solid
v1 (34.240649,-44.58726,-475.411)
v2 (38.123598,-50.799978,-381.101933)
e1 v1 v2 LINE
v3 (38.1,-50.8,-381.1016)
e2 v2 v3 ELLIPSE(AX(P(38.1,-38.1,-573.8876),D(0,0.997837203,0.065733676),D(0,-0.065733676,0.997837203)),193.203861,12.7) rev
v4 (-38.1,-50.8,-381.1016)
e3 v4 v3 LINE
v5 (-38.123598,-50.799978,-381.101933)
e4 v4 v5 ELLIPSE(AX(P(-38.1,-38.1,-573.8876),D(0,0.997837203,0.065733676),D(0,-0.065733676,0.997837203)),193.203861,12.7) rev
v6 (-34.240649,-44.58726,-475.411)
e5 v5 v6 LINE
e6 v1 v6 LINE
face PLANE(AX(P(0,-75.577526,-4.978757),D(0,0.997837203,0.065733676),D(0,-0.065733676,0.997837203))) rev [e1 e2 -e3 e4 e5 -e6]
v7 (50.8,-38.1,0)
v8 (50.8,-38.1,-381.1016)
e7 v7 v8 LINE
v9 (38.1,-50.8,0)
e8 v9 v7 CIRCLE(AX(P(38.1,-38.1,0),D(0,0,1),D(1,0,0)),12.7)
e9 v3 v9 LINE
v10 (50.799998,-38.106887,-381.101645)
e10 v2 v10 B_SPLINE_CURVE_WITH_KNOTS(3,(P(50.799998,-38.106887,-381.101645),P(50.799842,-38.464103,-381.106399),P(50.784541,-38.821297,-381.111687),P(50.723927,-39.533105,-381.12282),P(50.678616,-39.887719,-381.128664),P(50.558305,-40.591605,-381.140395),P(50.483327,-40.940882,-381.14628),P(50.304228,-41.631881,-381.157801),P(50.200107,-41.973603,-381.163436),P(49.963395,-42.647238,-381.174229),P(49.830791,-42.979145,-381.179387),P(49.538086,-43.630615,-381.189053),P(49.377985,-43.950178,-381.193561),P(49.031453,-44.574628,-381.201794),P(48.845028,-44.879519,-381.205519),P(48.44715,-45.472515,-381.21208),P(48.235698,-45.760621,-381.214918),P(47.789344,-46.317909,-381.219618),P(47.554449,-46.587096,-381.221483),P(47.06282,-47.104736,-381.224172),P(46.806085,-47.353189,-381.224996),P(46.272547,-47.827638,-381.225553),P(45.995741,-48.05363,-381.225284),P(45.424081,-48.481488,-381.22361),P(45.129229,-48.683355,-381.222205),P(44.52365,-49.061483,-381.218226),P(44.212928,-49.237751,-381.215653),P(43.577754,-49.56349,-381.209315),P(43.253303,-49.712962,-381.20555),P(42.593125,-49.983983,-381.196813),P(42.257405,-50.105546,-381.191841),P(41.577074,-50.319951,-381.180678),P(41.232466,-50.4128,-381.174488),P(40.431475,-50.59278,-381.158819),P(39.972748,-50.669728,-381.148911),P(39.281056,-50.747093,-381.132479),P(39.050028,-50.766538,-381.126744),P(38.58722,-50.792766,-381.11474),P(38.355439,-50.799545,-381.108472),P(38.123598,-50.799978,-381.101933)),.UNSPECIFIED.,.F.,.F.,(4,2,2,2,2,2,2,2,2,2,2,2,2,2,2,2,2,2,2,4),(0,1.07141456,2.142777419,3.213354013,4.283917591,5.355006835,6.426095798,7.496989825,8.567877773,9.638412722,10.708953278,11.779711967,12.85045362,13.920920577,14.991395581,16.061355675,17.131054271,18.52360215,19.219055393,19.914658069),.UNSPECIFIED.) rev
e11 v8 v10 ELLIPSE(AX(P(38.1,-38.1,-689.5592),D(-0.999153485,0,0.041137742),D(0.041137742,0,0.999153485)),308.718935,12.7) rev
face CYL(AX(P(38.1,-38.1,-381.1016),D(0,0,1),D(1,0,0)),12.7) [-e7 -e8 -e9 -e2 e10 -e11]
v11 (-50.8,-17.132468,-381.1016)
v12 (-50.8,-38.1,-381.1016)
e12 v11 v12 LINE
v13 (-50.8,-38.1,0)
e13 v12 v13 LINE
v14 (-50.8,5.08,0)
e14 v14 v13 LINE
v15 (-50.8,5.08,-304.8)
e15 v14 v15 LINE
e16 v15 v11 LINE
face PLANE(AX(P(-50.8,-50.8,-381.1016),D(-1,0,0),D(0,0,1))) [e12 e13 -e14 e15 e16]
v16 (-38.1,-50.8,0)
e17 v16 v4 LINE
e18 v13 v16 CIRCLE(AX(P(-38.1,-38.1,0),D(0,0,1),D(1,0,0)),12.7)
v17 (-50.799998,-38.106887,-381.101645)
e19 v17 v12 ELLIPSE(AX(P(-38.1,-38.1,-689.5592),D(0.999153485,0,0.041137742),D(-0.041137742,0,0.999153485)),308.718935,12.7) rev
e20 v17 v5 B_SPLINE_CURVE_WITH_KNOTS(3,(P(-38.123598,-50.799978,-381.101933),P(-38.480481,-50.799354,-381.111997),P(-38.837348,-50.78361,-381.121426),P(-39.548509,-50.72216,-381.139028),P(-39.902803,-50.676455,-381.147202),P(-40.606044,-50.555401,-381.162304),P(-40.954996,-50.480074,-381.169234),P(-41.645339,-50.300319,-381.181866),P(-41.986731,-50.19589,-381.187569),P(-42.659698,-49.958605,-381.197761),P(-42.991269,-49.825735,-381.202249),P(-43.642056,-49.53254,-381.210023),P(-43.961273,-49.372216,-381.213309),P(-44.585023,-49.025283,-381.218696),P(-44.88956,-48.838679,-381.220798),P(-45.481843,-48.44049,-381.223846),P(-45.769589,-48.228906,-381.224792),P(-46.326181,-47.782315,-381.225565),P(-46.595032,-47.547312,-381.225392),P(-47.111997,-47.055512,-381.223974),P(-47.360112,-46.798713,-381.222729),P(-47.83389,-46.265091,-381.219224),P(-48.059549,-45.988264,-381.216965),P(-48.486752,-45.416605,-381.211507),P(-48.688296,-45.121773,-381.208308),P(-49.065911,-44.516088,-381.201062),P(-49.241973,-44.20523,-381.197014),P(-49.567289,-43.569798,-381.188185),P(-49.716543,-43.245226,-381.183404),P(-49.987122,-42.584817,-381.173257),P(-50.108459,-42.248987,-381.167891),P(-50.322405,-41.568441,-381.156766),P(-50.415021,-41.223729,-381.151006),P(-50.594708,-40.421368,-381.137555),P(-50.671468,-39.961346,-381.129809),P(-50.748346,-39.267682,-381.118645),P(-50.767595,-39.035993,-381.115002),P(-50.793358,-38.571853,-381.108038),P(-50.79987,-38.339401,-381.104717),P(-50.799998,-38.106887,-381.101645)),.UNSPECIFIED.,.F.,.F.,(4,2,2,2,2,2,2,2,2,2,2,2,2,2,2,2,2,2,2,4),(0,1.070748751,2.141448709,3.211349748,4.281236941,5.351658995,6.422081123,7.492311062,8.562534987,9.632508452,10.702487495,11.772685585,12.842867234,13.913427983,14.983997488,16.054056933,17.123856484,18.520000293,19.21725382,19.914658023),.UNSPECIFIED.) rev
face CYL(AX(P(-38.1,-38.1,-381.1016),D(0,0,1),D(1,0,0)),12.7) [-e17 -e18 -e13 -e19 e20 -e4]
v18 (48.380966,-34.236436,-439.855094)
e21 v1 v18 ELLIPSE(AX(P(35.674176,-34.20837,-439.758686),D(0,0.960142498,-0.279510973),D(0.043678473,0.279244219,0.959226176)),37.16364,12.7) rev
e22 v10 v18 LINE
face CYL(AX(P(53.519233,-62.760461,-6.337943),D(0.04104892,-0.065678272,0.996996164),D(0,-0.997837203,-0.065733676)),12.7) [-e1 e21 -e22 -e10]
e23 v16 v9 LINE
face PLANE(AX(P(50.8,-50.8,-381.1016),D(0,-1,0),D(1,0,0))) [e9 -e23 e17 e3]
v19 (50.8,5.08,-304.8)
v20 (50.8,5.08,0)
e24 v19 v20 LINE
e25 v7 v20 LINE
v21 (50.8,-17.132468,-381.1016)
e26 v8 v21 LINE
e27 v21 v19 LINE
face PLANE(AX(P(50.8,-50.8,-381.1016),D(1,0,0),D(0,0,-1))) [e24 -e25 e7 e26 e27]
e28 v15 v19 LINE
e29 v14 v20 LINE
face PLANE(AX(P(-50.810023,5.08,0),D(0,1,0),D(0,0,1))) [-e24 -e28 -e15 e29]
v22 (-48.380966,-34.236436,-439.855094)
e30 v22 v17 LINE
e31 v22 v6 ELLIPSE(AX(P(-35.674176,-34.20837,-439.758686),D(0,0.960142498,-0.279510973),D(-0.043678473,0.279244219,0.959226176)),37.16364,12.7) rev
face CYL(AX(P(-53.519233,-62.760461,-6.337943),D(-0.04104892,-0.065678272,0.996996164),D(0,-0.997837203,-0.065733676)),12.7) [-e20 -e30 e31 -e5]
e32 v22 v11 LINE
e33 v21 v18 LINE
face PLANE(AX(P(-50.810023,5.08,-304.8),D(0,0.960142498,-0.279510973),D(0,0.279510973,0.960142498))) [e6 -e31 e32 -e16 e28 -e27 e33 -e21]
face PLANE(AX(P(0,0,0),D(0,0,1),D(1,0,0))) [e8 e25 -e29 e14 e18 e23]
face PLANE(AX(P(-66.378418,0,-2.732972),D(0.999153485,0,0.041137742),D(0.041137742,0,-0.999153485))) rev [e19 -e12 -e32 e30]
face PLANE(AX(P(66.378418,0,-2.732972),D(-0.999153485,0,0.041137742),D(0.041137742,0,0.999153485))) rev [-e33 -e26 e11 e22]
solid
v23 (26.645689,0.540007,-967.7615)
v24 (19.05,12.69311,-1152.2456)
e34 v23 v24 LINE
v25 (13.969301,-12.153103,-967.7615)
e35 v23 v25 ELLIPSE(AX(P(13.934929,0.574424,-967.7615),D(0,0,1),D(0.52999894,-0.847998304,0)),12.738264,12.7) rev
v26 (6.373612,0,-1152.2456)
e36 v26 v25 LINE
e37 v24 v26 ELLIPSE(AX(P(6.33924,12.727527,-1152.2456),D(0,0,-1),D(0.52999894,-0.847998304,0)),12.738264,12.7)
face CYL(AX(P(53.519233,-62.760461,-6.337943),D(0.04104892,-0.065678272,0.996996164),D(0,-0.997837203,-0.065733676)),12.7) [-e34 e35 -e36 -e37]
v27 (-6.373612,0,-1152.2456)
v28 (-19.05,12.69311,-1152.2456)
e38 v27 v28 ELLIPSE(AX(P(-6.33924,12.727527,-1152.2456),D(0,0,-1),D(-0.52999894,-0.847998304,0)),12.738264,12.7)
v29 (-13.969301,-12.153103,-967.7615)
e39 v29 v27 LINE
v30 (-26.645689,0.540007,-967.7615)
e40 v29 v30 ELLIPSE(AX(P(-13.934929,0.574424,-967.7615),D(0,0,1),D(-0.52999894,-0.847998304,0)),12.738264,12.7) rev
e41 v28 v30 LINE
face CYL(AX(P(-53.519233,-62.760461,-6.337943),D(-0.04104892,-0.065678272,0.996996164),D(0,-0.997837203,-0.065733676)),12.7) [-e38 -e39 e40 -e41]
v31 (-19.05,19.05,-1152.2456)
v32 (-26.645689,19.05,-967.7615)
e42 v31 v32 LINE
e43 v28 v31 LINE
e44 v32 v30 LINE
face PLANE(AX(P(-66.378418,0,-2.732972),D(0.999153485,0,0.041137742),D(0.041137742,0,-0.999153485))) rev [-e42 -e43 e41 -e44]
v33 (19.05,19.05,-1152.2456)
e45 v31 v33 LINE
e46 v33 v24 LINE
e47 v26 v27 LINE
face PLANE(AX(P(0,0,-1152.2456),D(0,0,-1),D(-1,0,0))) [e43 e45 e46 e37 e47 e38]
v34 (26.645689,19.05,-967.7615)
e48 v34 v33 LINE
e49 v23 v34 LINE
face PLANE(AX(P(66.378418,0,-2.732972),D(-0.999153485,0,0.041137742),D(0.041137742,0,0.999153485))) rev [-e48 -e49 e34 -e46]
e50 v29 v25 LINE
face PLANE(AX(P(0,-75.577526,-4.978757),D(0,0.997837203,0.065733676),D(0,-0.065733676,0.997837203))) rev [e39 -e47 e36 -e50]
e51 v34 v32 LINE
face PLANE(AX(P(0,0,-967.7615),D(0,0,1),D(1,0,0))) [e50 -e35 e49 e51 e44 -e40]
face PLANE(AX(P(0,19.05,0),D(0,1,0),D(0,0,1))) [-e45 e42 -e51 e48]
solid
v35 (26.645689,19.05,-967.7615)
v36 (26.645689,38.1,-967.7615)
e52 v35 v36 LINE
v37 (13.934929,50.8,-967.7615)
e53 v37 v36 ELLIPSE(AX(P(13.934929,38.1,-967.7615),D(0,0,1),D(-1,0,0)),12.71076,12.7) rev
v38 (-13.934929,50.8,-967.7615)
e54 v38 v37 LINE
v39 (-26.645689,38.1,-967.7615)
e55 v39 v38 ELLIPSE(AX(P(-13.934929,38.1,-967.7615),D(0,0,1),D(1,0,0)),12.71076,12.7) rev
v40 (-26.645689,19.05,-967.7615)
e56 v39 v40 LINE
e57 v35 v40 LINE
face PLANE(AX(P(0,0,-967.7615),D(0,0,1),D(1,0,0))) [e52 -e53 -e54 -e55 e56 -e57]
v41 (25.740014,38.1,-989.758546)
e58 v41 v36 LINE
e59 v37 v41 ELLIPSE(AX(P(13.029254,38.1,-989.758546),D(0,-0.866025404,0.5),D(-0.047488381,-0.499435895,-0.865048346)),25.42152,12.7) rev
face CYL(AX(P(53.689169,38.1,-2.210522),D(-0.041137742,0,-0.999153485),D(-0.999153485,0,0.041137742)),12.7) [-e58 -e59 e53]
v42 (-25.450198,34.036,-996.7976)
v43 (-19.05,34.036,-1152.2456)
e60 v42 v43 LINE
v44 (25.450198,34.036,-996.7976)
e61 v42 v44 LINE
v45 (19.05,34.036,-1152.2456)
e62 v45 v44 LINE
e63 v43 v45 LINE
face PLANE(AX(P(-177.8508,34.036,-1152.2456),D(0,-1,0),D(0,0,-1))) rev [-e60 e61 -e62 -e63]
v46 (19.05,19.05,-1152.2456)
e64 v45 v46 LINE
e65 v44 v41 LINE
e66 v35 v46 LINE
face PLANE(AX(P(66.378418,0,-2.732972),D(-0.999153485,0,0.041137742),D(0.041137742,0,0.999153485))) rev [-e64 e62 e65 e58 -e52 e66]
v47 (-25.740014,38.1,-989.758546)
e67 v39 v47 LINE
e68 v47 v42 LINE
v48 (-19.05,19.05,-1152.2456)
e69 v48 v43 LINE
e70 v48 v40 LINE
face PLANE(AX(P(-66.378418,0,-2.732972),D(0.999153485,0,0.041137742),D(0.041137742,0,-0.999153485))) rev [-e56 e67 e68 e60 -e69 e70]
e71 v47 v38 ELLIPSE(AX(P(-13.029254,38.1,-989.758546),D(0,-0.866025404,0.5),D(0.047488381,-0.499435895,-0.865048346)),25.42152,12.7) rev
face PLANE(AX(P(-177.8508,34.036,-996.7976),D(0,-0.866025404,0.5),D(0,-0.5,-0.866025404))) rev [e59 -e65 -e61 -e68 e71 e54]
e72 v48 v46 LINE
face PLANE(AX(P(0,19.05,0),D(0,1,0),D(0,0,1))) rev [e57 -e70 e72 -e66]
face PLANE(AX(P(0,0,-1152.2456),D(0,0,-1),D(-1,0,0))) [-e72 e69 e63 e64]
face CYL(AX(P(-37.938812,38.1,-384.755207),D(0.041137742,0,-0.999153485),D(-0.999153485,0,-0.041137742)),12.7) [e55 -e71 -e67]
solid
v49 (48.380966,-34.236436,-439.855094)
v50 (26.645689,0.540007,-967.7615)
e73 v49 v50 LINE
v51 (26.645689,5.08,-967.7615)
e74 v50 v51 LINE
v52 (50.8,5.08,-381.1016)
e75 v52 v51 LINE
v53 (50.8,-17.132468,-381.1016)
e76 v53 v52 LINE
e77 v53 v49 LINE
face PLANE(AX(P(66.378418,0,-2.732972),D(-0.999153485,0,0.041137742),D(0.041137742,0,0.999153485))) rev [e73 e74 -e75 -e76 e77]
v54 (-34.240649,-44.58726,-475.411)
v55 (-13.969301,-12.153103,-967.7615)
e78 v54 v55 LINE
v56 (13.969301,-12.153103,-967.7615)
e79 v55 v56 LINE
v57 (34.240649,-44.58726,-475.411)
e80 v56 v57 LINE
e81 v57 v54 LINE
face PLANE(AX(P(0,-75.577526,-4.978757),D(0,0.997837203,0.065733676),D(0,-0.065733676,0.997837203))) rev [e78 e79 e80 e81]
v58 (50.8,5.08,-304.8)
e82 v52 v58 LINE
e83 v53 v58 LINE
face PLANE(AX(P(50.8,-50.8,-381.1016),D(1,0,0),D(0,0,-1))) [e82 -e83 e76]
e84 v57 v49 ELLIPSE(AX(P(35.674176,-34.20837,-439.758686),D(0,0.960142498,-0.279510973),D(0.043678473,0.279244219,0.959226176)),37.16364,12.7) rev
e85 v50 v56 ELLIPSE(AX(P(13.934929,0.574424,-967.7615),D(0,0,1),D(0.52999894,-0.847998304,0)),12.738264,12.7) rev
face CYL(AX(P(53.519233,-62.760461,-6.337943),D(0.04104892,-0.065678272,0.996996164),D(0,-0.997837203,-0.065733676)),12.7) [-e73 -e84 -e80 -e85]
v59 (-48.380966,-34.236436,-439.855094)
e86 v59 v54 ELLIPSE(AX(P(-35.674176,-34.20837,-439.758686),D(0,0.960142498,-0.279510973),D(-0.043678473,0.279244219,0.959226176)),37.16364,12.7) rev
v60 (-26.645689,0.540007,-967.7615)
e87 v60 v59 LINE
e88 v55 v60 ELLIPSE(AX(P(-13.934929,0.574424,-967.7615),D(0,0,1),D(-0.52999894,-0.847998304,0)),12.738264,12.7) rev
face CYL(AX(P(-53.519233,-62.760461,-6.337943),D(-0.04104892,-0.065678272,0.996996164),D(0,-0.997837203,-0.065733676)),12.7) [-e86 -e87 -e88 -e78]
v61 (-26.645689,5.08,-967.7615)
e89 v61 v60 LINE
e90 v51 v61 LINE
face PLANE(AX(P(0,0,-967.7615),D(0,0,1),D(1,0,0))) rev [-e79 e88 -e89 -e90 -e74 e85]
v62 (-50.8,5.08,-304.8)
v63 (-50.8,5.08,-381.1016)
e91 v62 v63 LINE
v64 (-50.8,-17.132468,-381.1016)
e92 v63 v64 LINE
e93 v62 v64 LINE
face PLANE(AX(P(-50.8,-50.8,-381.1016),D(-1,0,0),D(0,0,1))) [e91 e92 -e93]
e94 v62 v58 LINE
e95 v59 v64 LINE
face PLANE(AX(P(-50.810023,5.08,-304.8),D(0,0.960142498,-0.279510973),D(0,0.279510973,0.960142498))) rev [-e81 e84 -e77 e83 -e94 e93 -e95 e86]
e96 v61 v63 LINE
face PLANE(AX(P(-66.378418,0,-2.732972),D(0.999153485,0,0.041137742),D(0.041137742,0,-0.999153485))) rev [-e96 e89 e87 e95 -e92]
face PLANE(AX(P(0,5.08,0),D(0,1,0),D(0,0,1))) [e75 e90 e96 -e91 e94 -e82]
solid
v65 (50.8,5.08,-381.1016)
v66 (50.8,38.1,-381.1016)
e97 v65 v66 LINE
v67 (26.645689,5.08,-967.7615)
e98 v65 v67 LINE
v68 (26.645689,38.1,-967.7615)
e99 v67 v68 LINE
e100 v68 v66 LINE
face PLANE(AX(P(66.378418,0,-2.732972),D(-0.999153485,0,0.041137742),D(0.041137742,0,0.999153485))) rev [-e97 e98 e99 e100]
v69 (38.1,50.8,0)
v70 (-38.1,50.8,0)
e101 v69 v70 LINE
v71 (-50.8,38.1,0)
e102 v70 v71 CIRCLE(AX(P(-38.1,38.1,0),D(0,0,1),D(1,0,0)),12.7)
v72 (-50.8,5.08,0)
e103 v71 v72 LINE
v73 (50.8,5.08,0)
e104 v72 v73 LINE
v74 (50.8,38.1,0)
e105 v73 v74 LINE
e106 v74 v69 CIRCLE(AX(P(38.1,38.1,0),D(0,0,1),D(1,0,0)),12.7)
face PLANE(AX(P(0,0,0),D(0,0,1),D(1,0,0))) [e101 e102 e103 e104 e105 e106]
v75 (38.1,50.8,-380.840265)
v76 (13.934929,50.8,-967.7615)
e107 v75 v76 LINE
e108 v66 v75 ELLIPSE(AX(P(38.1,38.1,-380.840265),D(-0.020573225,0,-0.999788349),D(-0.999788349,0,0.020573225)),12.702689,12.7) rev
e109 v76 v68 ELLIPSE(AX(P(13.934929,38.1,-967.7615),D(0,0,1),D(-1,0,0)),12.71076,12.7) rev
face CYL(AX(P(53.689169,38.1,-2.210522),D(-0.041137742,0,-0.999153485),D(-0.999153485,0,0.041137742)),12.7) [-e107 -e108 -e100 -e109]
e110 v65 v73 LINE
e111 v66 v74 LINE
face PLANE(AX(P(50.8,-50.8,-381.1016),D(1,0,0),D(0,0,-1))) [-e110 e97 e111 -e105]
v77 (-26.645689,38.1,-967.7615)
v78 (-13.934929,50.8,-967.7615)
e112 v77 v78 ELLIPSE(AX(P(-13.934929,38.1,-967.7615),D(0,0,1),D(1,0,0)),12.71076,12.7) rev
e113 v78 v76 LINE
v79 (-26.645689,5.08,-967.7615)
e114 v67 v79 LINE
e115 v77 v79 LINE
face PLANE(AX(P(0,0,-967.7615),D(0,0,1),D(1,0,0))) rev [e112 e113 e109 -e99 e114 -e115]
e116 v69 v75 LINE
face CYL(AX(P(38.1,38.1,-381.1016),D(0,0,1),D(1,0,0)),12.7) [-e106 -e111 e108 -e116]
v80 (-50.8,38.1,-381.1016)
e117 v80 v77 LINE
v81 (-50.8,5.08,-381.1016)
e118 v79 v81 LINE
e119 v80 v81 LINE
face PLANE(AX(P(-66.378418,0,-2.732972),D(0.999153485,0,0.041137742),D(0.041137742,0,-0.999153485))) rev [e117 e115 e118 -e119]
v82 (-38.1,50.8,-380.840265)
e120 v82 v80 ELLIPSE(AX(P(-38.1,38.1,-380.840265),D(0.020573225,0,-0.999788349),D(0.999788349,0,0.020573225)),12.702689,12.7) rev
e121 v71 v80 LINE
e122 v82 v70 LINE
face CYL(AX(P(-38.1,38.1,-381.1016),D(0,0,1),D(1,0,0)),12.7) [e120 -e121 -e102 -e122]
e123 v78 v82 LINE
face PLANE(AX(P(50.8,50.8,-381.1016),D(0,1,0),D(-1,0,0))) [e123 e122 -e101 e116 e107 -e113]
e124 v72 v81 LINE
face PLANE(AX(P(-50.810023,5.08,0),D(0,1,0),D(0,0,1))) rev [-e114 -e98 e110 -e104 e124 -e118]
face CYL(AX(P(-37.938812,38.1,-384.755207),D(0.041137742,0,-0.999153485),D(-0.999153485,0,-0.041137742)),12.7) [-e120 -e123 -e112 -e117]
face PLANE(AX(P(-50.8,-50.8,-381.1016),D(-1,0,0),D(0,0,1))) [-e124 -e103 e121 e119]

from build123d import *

# Parameters (mm, degrees)
SKETCH1_W              = 101.6
SKETCH1_H              = 101.6
BOSS_EXTRUDE1_DEPTH    = 381.1016
FILLET1_R              = 12.7
CUT_EXTRUDE2_DEPTH     = 177.8508
SPLIT1_SURFACE_1_BACK  = 1162.17
SPLIT1_SURFACE_1_DEPTH = 2324.34
SPLIT1_SURFACE_2_BACK  = 1162.17
SPLIT1_SURFACE_2_DEPTH = 2324.34


with BuildPart() as part:
    # Sketch1 → Boss-Extrude1 (new body)
    with BuildSketch(Plane.XY):
        Rectangle(SKETCH1_W, SKETCH1_H)
    extrude(amount=-BOSS_EXTRUDE1_DEPTH)

    # Sketch2 → section 0 of loft1
    with BuildSketch(Plane(origin=(0, 0, -1152.2456), x_dir=(-1, 0, 0), z_dir=(0, 0, -1)), mode=Mode.PRIVATE) as loft1_s0:
        with BuildLine():
            Line((-19.05, 50.8), (19.05, 50.8))
            Line((19.05, 50.8), (19.05, 0))
            Line((19.05, 0), (-19.05, 0))
            Line((-19.05, 0), (-19.05, 50.8))
        make_face()
    # loft up to a face of the part (loft1)
    loft([loft1_s0.sketch, part.faces().sort_by_distance((0, 0, -381.1016))[0]])

    # Fillet1
    # the kernel refuses this fillet: 12.7 mm, written as the material it takes off along each edge
    with BuildSketch(Plane(origin=(-50.8, -50.8, 31.75), x_dir=(1, 0, 0), z_dir=(0, 0, -1)), Plane(origin=(-50.8, 50.8, 31.75), x_dir=(0, -1, 0), z_dir=(0, 0, -1))) as fillet1_piece_1:
        with BuildLine():
            CenterArc((FILLET1_R, -FILLET1_R), FILLET1_R, 90, 90)
            Line((0, -FILLET1_R), (0, 0))
            Line((0, 0), (FILLET1_R, 0))
        make_face()
    extrude(amount=444.6016, mode=Mode.SUBTRACT)
    with BuildSketch(Plane(origin=(50.8, 50.8, 31.75), x_dir=(0, -1, 0), z_dir=(0, 0, -1)), Plane(origin=(50.8, -50.8, 31.75), x_dir=(-1, 0, 0), z_dir=(0, 0, -1))) as fillet1_piece_2:
        with BuildLine():
            CenterArc((FILLET1_R, FILLET1_R), FILLET1_R, 180, 90)
            Line((0, FILLET1_R), (0, 0))
            Line((0, 0), (FILLET1_R, 0))
        make_face()
    extrude(amount=444.6016, mode=Mode.SUBTRACT)
    with BuildSketch(Plane(origin=(17.750216352, 2.079653836, -1183.814745237), x_dir=(-0.999157137883709, -0.002698296397467829, 0.0409601393135606), z_dir=(0.04104891979132801, -0.06567827166612486, 0.9969961638917754))) as fillet1_piece_3:
        with BuildLine():
            CenterArc((FILLET1_R * 0.997299511279, -FILLET1_R), FILLET1_R, 90, 89.845064287)
            Line((-FILLET1_R * 0.00269683254081, -FILLET1_R * 0.997295864973), (0, 0))
            Line((0, 0), (FILLET1_R * 0.997299511279, 0))
        make_face()
    extrude(amount=836.795888178, mode=Mode.SUBTRACT)
    with BuildSketch(Plane(origin=(-17.750216352, 2.079653836, -1183.814745237), x_dir=(0.999157137883709, -0.0026982963974682855, 0.040960139313560615), z_dir=(-0.041048919791328055, -0.06567827166612487, 0.9969961638917754))) as fillet1_piece_4:
        with BuildLine():
            CenterArc((FILLET1_R * 0.997299511279, FILLET1_R), FILLET1_R, 180.154935713, 89.845064287)
            Line((-FILLET1_R * 0.00269683254081, FILLET1_R * 0.997295864973), (0, 0))
            Line((0, 0), (FILLET1_R * 0.997299511279, 0))
        make_face()
    extrude(amount=836.795888178, mode=Mode.SUBTRACT)
    with BuildSketch(Plane(origin=(-17.743876682, 50.8, -1183.968723142), x_dir=(0.9991534847855587, 0, 0.041137742291895554), z_dir=(-0.041137742291895554, 0, 0.9991534847855587))) as fillet1_piece_5:
        with BuildLine():
            CenterArc((FILLET1_R, -FILLET1_R), FILLET1_R, 90, 90)
            Line((0, -FILLET1_R), (0, 0))
            Line((0, 0), (FILLET1_R, 0))
        make_face()
    extrude(amount=835.297338189, mode=Mode.SUBTRACT)
    with BuildSketch(Plane(origin=(17.743876682, 50.8, -1183.968723142), x_dir=(-0.9991534847855587, 0, 0.041137742291895485), z_dir=(0.04113774229189549, 0, 0.9991534847855587))) as fillet1_piece_6:
        with BuildLine():
            CenterArc((FILLET1_R, FILLET1_R), FILLET1_R, 180, 90)
            Line((0, FILLET1_R), (0, 0))
            Line((0, 0), (FILLET1_R, 0))
        make_face()
    extrude(amount=835.297338189, mode=Mode.SUBTRACT)

    # Sketch4 → Cut-Extrude2 (cut, symmetric)
    with BuildSketch(Plane(origin=(0, 0, 0), x_dir=(0, 0, -1), z_dir=(1, 0, 0))):
        Polygon((1152.2456, 50.8), (1152.2456, 34.036), (996.7976, 34.036), (967.761500262, 50.8), align=None)
    extrude(amount=CUT_EXTRUDE2_DEPTH, both=True, mode=Mode.SUBTRACT)


with BuildPart() as body_2:
    # Split1: the piece behind the surface
    add(part.part)
    # Split1 surface: a surface, the sketch's curves swept straight by 2324.34 mm
    with BuildLine(Plane(origin=(50.8, 0, 0), x_dir=(0, 0, -1), z_dir=(1, 0, 0)).offset(-SPLIT1_SURFACE_1_BACK), mode=Mode.PRIVATE) as split1_surface_1_path:
        Line((0, -50.8), (0, 5.08))
        Line((0, 5.08), (304.8, 5.08))
        Line((304.8, 5.08), (475.411000163, -44.587259541))
        Line((475.411000163, -44.587259541), (381.1016, -50.8))
        Line((381.1016, -50.8), (0, -50.8))
    split1_surface_1 = Shell.extrude(split1_surface_1_path.wire(), (1 * SPLIT1_SURFACE_1_DEPTH, 0 * SPLIT1_SURFACE_1_DEPTH, 0 * SPLIT1_SURFACE_1_DEPTH))
    split(bisect_by=split1_surface_1, keep=Keep.BOTTOM)


with BuildPart() as part_1:
    add(part.part)

    # Split1: split by a surface, the side it looks to stays
    # Split1 surface: a surface, the sketch's curves swept straight by 2324.34 mm
    with BuildLine(Plane(origin=(50.8, 0, 0), x_dir=(0, 0, -1), z_dir=(1, 0, 0)).offset(-SPLIT1_SURFACE_2_BACK), mode=Mode.PRIVATE) as split1_surface_2_path:
        Line((0, -50.8), (0, 5.08))
        Line((0, 5.08), (304.8, 5.08))
        Line((304.8, 5.08), (475.411000163, -44.587259541))
        Line((475.411000163, -44.587259541), (381.1016, -50.8))
        Line((381.1016, -50.8), (0, -50.8))
    split1_surface_2 = Shell.extrude(split1_surface_2_path.wire(), (1 * SPLIT1_SURFACE_2_DEPTH, 0 * SPLIT1_SURFACE_2_DEPTH, 0 * SPLIT1_SURFACE_2_DEPTH))
    split(bisect_by=split1_surface_2, keep=Keep.TOP)


with BuildPart() as body_3:
    # Split3: the piece on the far side of the plane
    add(part_1.part)
    split(bisect_by=Plane.XY.offset(-967.761500262), keep=Keep.BOTTOM)


with BuildPart() as part_2:
    add(part_1.part)

    # Split3
    split(bisect_by=Plane.XY.offset(-967.761500262), keep=Keep.TOP)


with BuildPart() as body_4:
    # Split2: the piece on the far side of the plane
    add(part_2.part)
    split(bisect_by=Plane.ZX.offset(5.08), keep=Keep.BOTTOM)


with BuildPart() as part_3:
    add(part_2.part)

    # Split2
    split(bisect_by=Plane.ZX.offset(5.08), keep=Keep.TOP)


with BuildPart() as body_5:
    # Split4: the piece on the far side of the plane
    add(body_3.part)
    split(bisect_by=Plane.ZX.offset(19.05), keep=Keep.BOTTOM)


with BuildPart() as body_3_1:
    add(body_3.part)

    # Split4
    split(bisect_by=Plane.ZX.offset(19.05), keep=Keep.TOP)


solid = Compound([body_2.part, body_4.part, part_3.part, body_5.part, body_3_1.part])
